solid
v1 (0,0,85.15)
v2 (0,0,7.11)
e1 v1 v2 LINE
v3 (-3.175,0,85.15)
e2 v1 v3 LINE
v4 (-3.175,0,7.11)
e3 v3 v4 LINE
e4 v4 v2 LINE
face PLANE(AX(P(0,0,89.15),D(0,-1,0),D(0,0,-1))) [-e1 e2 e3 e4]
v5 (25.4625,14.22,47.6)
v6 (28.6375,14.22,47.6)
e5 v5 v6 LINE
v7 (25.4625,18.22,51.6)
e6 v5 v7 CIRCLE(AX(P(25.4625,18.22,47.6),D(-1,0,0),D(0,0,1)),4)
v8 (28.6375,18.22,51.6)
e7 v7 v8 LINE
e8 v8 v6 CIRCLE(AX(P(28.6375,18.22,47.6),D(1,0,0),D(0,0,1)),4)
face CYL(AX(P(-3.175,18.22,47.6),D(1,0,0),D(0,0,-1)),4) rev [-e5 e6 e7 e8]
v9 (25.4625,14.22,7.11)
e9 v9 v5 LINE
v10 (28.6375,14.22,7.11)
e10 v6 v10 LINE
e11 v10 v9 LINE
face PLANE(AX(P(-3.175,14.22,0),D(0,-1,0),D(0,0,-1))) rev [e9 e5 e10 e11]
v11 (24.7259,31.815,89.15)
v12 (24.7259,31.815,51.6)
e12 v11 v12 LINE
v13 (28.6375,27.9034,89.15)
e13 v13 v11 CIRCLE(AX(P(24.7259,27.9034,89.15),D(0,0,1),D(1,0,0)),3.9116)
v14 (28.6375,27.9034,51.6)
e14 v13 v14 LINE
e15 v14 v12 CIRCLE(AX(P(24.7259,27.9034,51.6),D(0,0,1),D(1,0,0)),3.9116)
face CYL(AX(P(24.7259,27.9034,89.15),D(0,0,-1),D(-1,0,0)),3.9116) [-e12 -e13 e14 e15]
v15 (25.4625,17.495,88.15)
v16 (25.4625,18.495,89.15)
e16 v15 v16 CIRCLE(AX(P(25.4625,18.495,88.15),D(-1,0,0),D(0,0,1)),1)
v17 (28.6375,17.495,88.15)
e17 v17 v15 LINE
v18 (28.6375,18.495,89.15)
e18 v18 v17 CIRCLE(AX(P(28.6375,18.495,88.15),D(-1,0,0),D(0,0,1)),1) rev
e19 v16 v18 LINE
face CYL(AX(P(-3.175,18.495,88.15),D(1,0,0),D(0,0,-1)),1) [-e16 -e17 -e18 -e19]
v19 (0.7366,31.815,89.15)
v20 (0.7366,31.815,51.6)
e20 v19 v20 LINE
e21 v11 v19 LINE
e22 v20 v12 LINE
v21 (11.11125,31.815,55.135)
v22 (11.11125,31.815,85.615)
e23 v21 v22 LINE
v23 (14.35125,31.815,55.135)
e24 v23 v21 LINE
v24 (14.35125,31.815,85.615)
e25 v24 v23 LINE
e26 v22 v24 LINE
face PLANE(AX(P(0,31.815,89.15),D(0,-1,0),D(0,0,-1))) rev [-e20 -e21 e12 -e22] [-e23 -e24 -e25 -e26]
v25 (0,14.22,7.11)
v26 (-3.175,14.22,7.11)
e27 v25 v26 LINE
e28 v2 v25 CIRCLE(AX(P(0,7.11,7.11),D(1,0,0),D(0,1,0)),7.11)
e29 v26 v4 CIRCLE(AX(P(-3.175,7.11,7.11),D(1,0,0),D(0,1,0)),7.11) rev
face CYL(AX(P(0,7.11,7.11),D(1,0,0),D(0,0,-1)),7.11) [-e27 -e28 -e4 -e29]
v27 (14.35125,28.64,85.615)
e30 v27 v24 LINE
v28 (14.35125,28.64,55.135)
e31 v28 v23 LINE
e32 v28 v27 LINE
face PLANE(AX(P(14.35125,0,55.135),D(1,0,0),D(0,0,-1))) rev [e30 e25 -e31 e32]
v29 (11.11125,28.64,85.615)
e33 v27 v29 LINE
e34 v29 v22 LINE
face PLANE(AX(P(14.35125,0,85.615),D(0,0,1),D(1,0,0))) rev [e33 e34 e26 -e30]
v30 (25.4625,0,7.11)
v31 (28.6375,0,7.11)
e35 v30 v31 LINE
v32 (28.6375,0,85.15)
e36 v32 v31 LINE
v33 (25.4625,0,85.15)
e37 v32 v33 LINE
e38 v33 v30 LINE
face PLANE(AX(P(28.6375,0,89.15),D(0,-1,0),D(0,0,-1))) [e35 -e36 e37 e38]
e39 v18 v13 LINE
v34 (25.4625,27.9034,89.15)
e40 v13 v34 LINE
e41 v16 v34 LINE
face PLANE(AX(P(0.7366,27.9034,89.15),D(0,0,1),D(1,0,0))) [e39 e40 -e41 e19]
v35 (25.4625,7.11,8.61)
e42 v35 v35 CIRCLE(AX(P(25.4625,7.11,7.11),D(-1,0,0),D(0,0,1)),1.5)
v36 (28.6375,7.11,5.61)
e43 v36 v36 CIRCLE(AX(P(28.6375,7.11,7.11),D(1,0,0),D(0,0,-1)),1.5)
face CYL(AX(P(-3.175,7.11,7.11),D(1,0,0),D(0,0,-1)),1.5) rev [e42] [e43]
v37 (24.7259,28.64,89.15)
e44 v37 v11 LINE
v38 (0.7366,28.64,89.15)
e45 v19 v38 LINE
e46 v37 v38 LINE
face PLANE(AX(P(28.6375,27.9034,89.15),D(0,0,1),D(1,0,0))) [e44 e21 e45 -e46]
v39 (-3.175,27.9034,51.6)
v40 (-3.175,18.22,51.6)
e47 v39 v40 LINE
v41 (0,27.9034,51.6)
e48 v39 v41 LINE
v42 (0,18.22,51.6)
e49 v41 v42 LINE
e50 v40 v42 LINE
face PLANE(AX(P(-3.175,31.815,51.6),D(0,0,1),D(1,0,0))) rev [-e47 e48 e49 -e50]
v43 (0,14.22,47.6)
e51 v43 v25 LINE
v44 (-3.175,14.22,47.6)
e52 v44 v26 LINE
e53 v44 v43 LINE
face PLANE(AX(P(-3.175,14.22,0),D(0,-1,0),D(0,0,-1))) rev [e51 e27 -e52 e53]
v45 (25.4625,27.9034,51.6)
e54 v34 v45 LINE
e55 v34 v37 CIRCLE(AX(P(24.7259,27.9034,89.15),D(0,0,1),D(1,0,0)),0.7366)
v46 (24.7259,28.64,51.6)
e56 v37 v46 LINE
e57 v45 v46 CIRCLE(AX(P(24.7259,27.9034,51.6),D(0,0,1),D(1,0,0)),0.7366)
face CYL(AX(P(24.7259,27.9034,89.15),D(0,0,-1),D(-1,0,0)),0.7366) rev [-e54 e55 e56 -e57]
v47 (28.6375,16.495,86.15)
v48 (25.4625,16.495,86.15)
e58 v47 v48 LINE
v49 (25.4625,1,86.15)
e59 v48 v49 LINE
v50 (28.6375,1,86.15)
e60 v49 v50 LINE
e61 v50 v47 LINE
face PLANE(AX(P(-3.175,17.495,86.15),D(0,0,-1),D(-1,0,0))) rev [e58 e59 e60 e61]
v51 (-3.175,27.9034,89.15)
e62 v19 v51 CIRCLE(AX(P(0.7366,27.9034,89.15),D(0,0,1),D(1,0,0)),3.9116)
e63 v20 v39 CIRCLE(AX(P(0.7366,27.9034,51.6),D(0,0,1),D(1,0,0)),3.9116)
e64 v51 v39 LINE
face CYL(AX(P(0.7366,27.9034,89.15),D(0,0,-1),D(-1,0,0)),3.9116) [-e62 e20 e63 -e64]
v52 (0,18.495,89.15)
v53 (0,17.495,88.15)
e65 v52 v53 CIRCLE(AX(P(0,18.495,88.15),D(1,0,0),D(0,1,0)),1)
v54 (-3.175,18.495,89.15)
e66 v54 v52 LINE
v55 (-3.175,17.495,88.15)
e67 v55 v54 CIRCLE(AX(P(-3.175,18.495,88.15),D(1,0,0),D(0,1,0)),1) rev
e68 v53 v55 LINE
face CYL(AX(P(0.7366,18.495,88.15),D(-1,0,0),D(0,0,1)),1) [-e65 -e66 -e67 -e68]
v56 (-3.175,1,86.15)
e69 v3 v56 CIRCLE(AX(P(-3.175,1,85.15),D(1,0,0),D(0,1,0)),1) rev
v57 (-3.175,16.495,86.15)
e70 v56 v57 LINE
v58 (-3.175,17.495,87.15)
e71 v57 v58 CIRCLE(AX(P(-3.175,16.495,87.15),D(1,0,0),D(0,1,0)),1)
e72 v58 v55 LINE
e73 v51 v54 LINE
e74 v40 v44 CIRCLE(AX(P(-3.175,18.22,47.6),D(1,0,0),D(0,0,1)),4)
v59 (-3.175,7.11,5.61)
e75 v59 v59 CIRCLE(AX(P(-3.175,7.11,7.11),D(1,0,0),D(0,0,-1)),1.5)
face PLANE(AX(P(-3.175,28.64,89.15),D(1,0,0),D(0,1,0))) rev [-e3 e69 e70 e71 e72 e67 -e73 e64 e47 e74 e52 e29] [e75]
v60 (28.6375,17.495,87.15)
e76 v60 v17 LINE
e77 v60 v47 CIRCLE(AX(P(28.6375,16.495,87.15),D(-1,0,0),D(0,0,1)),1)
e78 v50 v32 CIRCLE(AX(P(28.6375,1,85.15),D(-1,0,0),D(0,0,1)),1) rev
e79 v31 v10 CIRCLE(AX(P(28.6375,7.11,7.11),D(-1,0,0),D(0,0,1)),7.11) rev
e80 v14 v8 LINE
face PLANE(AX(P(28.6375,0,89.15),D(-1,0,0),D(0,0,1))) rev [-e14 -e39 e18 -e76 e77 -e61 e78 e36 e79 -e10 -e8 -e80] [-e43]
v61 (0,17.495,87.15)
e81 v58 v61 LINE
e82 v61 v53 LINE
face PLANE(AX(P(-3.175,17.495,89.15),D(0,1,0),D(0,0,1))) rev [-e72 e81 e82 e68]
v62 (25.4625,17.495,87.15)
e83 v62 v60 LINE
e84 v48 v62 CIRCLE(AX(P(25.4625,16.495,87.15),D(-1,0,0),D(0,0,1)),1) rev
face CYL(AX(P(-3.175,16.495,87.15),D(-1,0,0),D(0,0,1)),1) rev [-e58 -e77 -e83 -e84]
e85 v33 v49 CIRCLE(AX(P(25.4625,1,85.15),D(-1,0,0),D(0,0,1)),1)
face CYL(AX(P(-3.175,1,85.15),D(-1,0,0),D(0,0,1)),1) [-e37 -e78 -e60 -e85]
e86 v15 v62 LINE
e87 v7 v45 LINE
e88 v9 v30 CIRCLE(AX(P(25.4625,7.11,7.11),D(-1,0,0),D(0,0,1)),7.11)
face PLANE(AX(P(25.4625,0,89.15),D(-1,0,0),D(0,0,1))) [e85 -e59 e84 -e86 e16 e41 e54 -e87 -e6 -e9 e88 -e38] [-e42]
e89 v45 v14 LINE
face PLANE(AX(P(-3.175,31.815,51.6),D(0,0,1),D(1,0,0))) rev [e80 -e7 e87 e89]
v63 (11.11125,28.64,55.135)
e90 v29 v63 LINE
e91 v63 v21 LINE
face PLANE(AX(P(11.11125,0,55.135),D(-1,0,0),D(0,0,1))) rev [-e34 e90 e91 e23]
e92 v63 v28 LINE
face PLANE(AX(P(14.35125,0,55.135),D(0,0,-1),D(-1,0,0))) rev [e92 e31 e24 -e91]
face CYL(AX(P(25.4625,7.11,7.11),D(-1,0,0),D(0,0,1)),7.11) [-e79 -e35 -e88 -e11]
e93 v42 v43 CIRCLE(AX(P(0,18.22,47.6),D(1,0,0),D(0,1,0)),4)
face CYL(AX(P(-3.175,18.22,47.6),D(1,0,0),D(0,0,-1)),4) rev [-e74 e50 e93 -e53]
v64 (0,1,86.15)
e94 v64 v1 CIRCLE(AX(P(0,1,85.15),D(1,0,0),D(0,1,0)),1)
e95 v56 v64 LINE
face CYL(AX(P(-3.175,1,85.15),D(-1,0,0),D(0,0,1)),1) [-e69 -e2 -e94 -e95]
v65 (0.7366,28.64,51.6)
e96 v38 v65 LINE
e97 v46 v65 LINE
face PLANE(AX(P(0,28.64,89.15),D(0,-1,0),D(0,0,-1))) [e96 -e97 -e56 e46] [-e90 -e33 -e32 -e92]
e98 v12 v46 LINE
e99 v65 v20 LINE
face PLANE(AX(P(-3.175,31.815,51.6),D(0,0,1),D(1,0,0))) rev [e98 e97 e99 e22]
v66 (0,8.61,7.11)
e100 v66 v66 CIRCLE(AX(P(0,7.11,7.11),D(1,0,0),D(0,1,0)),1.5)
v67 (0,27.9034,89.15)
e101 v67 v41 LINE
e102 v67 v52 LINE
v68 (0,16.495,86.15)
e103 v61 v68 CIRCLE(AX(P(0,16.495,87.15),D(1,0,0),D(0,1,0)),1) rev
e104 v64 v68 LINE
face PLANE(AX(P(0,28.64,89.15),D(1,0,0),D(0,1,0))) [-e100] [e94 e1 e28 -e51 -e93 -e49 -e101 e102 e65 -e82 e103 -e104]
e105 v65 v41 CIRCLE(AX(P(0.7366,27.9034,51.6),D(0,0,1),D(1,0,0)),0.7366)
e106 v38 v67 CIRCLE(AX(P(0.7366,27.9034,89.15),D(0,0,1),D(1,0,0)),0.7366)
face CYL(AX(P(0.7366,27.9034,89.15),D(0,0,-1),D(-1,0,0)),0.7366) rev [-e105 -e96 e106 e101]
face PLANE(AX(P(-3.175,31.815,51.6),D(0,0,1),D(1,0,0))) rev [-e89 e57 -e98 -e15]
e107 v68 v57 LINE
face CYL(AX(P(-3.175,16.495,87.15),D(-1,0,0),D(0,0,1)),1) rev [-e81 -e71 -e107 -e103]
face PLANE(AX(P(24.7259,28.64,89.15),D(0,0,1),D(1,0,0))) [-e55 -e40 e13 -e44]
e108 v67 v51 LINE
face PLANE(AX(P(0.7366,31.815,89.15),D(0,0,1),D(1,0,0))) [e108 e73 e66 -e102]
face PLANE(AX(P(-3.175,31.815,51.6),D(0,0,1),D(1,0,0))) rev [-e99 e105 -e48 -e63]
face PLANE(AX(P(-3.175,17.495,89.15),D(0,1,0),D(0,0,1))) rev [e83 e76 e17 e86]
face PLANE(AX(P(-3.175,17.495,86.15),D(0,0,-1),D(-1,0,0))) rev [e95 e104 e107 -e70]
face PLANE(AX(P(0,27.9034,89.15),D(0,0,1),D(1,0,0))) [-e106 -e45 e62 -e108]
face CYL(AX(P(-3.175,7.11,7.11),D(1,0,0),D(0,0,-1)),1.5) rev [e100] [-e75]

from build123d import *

# Parameters (mm, degrees)
BRIDA_BASE1_DEPTH          = 89.15
CORTAR_EXTRUIR3_DEPTH      = 100.859660931
CORTAR_EXTRUIR3_DEPTH_BACK = 100.859660931
CROQUIS7_W                 = 3
CROQUIS7_H                 = 17.495
REDONDEO6_R                = 1
REDONDEO8_RADIUS           = 7.11
REDONDEO8_LENGTH           = 3.175
REDONDEO9_RADIUS           = 7.11
REDONDEO9_LENGTH           = 3.175
CORTAR_EXTRUIR4_DEPTH      = 100.859660931
CORTAR_EXTRUIR4_DEPTH_BACK = 100.859660931
CROQUIS14_R                = 1.5
CORTAR_EXTRUIR5_DEPTH      = 99.89399947
CORTAR_EXTRUIR5_DEPTH_BACK = 99.89399947
CROQUIS15_W                = 3.24
CROQUIS15_H                = 30.48


# Sheet-metal steps are written as plain solids
with BuildPart() as part:
    # Croquis1 → Brida base1 (new body)
    with BuildSketch(Plane.XY):
        with BuildLine():
            Line((25.4625, 0), (25.4625, 27.9034))
            ThreePointArc((25.4625, 27.9034), (25.246754855, 28.424254855), (24.7259, 28.64))
            Line((24.7259, 28.64), (0.7366, 28.64))
            ThreePointArc((0.7366, 28.64), (0.215745145, 28.424254855), (0, 27.9034))
            Line((0, 27.9034), (0, 0))
            Line((0, 0), (-3.175, 0))
            Line((-3.175, 0), (-3.175, 27.9034))
            ThreePointArc((-3.175, 27.9034), (-2.029318885, 30.669318885), (0.7366, 31.815))
            Line((0.7366, 31.815), (24.7259, 31.815))
            ThreePointArc((24.7259, 31.815), (27.491818885, 30.669318885), (28.6375, 27.9034))
            Line((28.6375, 27.9034), (28.6375, 0))
            Line((28.6375, 0), (25.4625, 0))
        make_face()
    extrude(amount=BRIDA_BASE1_DEPTH)

    # Croquis7 → Cortar-Extruir3 (cut, two sides: drawn at the far end of the back side and taken through both)
    with BuildSketch(Plane(origin=(28.6375, 0, 0), x_dir=(0, 0, -1), z_dir=(1, 0, 0)).offset(-CORTAR_EXTRUIR3_DEPTH_BACK)):
        with BuildLine():
            Line((0, 31.815), (-51.6, 31.815))
            Line((-51.6, 31.815), (-51.6, 18.22))
            ThreePointArc((-51.6, 18.22), (-50.428427125, 15.391572875), (-47.6, 14.22))
            Line((-47.6, 14.22), (0, 14.22))
            Line((0, 14.22), (0, 31.815))
        make_face()
        with Locations((-87.65, 8.7475)):
            Rectangle(CROQUIS7_W, CROQUIS7_H)
    extrude(amount=CORTAR_EXTRUIR3_DEPTH + CORTAR_EXTRUIR3_DEPTH_BACK, mode=Mode.SUBTRACT)

    # Redondeo6
    redondeo6_edges = [part.edges().sort_by_distance(p)[0] for p in [
        (-1.5875, 17.495, 86.15),
        (-1.5875, 17.495, 89.15),
        (-1.5875, 0, 86.15),
        (27.05, 17.495, 86.15),
        (27.05, 0, 86.15),
        (27.05, 17.495, 89.15),
    ]]
    fillet(redondeo6_edges, radius=REDONDEO6_R)

    # Redondeo8: full round fillet: the end face becomes a half cylinder, R = half its width
    redondeo8_face = Plane((27.05, 7.11, 0), x_dir=(-1, 0, 0), z_dir=(0, 0, -1))  # on the end face: x along it, z out of the body
    redondeo8_slab = redondeo8_face.offset(-REDONDEO8_RADIUS / 2) * Box(REDONDEO8_LENGTH, 2 * REDONDEO8_RADIUS, REDONDEO8_RADIUS, mode=Mode.PRIVATE)  # the body's end, R deep
    redondeo8_round = Plane((27.05, 7.11, 7.11), x_dir=(0, 0, -1), z_dir=(-1, 0, 0)) * Cylinder(REDONDEO8_RADIUS, REDONDEO8_LENGTH, mode=Mode.PRIVATE)  # its axis R under the face
    add(redondeo8_slab - redondeo8_round, mode=Mode.SUBTRACT)

    # Redondeo9: full round fillet: the end face becomes a half cylinder, R = half its width
    redondeo9_face = Plane((-1.5875, 7.11, 0), x_dir=(-1, 0, 0), z_dir=(0, 0, -1))  # on the end face: x along it, z out of the body
    redondeo9_slab = redondeo9_face.offset(-REDONDEO9_RADIUS / 2) * Box(REDONDEO9_LENGTH, 2 * REDONDEO9_RADIUS, REDONDEO9_RADIUS, mode=Mode.PRIVATE)  # the body's end, R deep
    redondeo9_round = Plane((-1.5875, 7.11, 7.11), x_dir=(0, 0, -1), z_dir=(-1, 0, 0)) * Cylinder(REDONDEO9_RADIUS, REDONDEO9_LENGTH, mode=Mode.PRIVATE)  # its axis R under the face
    add(redondeo9_slab - redondeo9_round, mode=Mode.SUBTRACT)

    # Croquis14 → Cortar-Extruir4 (cut, two sides: drawn at the far end of the back side and taken through both)
    with BuildSketch(Plane(origin=(28.6375, 0, 0), x_dir=(0, 0, -1), z_dir=(1, 0, 0)).offset(-CORTAR_EXTRUIR4_DEPTH_BACK)):
        with Locations((-7.11, 7.11)):
            Circle(CROQUIS14_R)
    extrude(amount=CORTAR_EXTRUIR4_DEPTH + CORTAR_EXTRUIR4_DEPTH_BACK, mode=Mode.SUBTRACT)

    # Croquis15 → Cortar-Extruir5 (cut, two sides: drawn at the far end of the back side and taken through both)
    with BuildSketch(Plane(origin=(0, 31.815, 0), x_dir=(1, 0, 0), z_dir=(0, 1, 0)).offset(-CORTAR_EXTRUIR5_DEPTH_BACK)):
        with Locations((12.73125, -70.375)):
            Rectangle(CROQUIS15_W, CROQUIS15_H)
    extrude(amount=CORTAR_EXTRUIR5_DEPTH + CORTAR_EXTRUIR5_DEPTH_BACK, mode=Mode.SUBTRACT)


solid = part.part
